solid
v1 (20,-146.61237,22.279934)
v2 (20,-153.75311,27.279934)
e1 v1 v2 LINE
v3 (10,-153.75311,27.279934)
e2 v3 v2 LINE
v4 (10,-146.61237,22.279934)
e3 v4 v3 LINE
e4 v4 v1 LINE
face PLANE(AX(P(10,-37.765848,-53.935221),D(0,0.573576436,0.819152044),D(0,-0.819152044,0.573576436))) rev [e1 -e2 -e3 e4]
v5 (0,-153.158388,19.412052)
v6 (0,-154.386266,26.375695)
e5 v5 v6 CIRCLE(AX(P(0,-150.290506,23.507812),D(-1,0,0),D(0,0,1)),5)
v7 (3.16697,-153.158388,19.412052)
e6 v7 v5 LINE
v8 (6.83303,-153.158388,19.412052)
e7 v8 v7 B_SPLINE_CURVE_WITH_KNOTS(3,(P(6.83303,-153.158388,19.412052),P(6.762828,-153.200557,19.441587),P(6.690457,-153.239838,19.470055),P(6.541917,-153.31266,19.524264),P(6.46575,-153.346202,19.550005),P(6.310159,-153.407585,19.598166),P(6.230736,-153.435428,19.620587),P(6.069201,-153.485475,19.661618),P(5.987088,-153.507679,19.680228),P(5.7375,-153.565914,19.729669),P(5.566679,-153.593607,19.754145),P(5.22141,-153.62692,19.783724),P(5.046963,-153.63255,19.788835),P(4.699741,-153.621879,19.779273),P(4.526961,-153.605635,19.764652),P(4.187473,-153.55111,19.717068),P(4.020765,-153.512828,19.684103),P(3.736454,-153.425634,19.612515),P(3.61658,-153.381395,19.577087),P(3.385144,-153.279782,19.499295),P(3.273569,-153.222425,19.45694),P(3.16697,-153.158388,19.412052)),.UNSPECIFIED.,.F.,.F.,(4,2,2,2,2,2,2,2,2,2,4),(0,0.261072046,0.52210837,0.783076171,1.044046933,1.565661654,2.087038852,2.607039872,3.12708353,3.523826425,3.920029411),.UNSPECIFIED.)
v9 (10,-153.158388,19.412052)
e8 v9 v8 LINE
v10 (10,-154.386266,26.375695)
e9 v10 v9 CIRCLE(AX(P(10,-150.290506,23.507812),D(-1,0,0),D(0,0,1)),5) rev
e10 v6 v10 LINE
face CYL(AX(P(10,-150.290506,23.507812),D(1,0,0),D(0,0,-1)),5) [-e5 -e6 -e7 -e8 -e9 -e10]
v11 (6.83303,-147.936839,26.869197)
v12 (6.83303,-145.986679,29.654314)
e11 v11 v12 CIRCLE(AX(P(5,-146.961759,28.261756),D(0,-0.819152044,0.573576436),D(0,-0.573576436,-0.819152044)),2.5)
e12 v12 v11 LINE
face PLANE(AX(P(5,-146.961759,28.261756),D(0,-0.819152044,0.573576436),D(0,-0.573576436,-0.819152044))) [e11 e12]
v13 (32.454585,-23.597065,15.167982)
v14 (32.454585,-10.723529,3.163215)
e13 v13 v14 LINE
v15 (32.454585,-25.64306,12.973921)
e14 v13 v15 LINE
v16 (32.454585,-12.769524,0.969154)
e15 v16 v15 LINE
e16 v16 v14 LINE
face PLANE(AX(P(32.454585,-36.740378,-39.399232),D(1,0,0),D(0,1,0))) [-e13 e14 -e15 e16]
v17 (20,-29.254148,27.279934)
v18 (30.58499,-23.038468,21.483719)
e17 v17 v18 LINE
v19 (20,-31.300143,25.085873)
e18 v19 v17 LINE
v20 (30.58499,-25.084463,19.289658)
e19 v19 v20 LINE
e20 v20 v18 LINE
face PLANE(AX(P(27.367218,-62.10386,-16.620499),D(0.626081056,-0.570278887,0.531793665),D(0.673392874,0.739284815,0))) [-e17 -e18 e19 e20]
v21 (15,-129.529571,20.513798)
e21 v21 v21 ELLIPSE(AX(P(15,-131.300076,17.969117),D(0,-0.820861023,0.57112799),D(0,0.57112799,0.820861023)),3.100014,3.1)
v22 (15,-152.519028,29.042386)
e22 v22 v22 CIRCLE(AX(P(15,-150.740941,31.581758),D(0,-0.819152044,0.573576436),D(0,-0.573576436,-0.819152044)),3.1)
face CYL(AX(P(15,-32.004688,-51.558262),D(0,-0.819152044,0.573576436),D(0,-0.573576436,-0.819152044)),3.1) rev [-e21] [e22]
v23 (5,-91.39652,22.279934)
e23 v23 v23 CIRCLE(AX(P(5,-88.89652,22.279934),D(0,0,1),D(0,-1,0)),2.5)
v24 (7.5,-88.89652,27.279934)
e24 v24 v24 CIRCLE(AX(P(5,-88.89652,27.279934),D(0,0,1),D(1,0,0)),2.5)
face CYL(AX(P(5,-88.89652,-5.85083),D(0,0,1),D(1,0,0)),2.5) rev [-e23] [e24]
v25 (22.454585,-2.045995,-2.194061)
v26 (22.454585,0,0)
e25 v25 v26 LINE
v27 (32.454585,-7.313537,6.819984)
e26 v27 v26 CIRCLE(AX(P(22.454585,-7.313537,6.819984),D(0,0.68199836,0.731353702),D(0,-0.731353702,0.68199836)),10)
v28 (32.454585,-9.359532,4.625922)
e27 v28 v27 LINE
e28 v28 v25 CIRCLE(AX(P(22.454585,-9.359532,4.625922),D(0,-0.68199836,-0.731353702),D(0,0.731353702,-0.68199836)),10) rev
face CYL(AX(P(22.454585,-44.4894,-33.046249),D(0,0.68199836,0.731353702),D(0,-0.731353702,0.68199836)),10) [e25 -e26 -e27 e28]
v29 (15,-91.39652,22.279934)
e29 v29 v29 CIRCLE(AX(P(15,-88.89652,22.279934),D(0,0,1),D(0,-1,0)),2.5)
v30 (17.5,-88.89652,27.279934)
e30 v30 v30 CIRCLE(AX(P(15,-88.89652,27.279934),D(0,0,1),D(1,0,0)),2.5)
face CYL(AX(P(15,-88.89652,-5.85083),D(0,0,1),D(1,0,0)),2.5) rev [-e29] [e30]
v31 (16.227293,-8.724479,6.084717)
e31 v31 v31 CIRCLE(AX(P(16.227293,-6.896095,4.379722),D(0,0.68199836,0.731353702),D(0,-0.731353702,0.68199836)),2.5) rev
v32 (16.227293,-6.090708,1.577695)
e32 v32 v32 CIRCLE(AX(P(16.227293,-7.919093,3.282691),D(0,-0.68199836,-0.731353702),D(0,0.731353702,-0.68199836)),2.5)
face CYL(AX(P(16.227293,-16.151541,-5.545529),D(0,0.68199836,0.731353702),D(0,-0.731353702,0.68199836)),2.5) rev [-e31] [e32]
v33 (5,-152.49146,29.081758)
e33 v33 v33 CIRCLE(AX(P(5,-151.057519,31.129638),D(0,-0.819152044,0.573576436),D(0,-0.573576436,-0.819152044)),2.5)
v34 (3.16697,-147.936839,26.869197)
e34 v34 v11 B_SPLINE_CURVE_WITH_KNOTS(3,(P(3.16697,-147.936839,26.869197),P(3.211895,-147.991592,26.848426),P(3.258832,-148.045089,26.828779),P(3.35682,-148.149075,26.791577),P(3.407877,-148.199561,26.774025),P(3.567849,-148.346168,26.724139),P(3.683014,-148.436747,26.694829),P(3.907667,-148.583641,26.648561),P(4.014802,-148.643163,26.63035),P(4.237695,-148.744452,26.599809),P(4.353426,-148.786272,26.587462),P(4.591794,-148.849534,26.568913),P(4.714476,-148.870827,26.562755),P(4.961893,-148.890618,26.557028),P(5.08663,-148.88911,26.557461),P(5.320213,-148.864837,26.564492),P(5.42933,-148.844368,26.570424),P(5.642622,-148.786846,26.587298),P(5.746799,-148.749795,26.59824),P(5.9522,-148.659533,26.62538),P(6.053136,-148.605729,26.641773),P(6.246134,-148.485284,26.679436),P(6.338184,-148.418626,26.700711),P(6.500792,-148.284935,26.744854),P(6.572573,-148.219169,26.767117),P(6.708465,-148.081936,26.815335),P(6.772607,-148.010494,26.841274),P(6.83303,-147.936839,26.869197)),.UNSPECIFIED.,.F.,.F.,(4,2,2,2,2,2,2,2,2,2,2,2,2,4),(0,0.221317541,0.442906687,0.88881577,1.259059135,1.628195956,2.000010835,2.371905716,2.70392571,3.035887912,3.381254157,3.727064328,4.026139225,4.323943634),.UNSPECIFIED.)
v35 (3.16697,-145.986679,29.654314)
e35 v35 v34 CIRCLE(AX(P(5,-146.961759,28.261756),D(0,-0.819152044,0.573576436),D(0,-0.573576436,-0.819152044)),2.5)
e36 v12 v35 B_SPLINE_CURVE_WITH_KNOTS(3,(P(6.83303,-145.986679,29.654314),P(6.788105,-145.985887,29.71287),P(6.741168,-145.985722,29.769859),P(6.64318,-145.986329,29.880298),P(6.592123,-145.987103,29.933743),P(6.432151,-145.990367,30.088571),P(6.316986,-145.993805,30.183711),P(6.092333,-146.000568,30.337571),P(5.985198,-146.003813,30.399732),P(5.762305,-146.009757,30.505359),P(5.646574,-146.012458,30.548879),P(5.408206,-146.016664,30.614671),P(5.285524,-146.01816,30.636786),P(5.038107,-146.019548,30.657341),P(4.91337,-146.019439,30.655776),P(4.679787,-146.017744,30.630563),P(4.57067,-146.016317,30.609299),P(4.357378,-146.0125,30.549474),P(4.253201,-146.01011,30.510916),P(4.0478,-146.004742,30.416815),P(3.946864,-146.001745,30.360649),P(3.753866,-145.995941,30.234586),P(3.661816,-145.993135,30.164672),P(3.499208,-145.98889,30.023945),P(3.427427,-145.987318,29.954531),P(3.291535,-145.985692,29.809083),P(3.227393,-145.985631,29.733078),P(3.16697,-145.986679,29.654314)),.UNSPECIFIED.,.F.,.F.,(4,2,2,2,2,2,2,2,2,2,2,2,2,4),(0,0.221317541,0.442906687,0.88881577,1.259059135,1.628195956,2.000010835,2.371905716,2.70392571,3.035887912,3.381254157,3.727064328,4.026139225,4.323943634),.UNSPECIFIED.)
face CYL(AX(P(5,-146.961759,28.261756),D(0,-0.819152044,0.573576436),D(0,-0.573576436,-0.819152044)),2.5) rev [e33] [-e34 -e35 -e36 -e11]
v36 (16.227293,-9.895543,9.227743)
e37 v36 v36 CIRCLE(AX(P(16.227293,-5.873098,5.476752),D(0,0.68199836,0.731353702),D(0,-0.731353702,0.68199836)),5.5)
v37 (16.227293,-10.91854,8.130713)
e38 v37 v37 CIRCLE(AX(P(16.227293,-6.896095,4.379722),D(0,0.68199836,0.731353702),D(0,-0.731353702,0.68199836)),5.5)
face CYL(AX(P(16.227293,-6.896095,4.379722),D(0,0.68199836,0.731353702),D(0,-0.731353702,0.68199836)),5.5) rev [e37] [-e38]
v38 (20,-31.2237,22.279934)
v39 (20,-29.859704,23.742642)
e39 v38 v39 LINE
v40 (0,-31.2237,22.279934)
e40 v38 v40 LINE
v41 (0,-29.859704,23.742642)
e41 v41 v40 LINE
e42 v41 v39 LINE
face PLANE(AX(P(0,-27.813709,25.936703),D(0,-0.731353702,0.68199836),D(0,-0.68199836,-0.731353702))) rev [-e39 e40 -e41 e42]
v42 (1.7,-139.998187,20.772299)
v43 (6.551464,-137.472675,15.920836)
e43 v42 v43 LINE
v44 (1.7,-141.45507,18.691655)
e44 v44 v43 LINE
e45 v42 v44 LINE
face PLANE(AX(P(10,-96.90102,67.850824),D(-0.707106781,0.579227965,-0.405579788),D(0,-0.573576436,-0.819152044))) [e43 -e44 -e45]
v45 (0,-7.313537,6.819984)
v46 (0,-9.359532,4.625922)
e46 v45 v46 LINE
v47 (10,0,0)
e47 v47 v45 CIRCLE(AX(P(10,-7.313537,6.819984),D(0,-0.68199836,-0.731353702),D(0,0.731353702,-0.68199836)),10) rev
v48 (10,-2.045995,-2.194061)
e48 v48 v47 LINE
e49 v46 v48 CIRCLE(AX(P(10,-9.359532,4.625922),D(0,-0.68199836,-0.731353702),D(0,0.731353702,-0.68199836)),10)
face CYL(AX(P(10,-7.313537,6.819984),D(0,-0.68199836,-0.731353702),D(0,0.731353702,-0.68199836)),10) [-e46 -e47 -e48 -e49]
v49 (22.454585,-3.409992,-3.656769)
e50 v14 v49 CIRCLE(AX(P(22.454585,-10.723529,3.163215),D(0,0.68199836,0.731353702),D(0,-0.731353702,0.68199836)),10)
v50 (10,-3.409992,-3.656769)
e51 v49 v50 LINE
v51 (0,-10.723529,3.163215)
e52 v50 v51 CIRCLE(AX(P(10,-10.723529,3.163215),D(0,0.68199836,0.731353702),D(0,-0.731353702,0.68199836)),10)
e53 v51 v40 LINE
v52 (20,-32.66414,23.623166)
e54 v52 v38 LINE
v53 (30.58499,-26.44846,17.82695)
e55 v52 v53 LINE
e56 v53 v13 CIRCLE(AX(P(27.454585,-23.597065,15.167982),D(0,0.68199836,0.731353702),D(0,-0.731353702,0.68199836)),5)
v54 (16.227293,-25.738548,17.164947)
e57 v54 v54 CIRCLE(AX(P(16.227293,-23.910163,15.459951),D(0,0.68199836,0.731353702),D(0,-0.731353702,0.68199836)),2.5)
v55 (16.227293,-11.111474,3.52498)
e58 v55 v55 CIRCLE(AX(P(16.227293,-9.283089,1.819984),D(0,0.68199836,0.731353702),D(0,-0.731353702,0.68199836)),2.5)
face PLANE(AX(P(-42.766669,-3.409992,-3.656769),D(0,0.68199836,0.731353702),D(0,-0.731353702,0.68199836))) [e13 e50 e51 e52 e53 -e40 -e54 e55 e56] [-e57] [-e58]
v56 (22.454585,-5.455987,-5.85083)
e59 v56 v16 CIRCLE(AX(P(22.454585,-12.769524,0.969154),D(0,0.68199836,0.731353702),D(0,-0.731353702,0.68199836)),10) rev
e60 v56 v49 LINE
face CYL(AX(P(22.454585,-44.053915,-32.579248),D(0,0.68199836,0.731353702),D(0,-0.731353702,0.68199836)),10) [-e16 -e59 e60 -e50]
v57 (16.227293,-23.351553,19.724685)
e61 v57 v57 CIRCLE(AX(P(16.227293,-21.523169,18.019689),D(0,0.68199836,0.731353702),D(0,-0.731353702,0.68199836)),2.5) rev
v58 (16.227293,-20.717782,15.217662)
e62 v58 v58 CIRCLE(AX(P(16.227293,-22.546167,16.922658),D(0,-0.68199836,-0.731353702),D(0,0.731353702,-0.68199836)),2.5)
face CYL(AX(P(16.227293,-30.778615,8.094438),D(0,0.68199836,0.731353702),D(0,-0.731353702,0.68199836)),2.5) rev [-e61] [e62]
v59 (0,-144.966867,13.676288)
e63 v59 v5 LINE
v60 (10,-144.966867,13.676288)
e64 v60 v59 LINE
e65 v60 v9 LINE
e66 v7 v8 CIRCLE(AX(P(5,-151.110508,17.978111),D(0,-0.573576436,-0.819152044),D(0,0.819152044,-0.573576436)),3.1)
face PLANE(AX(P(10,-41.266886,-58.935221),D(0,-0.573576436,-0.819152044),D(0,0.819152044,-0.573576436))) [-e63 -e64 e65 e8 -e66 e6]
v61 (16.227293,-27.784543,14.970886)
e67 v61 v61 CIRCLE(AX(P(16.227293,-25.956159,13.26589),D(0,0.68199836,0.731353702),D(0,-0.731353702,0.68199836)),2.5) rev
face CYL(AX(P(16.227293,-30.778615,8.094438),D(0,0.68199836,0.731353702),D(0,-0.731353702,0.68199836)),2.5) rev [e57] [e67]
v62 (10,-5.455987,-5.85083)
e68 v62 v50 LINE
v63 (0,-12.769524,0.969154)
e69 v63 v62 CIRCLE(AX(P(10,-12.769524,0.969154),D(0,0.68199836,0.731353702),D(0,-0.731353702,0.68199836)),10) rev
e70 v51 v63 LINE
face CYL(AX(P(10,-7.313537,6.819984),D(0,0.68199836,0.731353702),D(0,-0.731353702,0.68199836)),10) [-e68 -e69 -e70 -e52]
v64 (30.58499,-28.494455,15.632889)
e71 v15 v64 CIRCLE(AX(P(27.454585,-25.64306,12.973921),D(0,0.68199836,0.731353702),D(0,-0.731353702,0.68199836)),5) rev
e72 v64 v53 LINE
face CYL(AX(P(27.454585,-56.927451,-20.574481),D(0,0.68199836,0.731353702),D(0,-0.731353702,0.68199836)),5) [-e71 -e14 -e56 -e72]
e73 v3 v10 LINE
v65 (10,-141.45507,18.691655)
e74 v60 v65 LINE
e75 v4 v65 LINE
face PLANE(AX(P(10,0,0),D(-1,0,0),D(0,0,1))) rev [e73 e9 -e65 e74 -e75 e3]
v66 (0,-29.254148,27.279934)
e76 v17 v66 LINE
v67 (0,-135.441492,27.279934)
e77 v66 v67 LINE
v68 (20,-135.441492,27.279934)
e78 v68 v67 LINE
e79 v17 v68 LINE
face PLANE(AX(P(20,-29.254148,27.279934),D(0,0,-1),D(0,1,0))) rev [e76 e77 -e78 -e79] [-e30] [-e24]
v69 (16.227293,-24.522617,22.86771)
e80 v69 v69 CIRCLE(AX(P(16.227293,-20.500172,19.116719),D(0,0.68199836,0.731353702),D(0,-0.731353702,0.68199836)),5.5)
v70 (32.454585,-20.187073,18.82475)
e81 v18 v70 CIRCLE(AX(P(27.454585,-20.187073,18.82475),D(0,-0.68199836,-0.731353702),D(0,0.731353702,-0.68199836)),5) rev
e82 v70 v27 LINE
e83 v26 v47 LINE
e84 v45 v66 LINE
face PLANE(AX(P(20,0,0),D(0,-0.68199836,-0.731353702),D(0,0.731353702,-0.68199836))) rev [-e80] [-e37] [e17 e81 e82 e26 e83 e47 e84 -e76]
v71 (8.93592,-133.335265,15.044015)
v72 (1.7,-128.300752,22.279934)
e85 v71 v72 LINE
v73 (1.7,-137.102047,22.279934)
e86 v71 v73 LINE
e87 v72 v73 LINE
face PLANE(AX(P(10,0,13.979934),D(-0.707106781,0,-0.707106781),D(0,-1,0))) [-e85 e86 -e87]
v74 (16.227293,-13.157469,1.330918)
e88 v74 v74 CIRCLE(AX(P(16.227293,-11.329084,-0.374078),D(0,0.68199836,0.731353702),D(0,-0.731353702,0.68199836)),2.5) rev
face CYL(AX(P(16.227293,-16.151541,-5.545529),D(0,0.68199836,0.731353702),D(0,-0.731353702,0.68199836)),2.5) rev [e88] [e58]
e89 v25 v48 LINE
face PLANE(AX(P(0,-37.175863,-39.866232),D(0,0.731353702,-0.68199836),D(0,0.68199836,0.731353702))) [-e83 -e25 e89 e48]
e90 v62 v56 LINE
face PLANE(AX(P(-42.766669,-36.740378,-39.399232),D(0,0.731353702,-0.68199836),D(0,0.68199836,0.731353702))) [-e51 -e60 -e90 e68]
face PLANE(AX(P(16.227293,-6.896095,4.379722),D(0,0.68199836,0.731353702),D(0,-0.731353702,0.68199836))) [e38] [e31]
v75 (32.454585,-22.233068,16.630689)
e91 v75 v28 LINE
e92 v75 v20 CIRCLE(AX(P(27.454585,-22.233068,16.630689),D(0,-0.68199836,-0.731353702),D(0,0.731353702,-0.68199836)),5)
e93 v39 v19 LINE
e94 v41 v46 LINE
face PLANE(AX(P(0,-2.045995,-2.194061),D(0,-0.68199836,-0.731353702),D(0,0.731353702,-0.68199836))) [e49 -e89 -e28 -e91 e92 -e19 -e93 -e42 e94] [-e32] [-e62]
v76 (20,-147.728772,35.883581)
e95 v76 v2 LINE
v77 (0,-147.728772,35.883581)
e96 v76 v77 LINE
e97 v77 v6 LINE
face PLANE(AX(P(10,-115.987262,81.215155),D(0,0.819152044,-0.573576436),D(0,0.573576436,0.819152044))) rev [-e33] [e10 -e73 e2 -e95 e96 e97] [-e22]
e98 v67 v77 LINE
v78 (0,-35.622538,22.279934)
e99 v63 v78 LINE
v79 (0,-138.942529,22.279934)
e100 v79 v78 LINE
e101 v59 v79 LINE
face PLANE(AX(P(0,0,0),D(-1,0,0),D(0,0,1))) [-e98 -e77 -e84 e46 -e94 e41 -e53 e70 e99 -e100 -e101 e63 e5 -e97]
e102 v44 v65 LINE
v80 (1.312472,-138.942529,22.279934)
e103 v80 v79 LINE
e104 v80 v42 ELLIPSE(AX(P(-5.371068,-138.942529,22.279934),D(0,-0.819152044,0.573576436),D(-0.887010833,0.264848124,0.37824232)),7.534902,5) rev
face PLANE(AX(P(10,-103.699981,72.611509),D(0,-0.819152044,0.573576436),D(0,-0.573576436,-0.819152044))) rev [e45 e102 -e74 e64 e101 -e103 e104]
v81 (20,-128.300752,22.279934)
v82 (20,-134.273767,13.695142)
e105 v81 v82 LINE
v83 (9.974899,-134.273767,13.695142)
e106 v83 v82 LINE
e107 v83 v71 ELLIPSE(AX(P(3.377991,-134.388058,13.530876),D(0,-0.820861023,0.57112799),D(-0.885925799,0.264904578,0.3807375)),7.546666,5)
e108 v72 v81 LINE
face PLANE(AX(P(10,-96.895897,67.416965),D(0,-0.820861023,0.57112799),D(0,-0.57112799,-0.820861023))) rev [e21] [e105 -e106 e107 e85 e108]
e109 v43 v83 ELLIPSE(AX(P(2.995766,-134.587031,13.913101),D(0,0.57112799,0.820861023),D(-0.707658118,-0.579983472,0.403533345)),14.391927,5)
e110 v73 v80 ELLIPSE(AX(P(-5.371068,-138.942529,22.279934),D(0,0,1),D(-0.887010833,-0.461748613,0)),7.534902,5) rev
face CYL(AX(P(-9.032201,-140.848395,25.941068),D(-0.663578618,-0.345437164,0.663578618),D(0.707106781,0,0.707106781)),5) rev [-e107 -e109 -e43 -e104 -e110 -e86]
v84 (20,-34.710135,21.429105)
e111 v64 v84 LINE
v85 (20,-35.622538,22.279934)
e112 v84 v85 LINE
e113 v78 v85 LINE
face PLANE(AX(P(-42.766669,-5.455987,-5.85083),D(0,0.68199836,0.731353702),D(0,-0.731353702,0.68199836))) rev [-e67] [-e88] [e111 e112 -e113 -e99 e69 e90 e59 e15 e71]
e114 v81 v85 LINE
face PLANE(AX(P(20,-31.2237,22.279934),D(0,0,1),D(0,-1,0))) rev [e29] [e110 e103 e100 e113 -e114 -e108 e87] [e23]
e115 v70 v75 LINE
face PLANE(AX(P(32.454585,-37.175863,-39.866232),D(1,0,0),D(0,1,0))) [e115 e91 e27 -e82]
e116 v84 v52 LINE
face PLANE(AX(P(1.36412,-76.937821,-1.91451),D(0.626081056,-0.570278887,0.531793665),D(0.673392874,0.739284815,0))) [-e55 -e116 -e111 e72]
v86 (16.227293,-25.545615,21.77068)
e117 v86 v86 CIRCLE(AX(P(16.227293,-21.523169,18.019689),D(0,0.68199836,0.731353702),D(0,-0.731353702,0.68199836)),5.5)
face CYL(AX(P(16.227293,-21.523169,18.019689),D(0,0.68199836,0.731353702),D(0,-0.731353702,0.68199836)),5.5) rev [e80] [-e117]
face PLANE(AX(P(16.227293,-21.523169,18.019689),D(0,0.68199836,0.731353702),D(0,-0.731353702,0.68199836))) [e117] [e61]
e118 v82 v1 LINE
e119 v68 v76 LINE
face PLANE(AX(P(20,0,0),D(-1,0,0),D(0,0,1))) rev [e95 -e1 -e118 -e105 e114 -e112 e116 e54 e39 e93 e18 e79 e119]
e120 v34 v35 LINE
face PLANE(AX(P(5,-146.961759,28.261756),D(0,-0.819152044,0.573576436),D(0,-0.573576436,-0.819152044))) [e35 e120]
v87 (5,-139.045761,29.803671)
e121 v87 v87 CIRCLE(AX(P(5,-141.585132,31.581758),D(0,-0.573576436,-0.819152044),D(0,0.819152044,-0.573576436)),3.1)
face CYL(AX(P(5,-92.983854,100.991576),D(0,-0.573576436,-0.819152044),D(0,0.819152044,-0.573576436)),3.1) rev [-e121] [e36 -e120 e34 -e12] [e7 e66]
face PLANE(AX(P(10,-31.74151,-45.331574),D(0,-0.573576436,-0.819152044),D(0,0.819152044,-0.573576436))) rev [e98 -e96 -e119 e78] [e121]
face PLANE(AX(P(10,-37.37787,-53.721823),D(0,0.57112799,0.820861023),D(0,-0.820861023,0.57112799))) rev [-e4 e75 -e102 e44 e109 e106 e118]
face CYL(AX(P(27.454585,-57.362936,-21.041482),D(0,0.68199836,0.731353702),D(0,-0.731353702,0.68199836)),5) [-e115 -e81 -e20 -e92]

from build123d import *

# Parameters (mm, degrees)
BOSS_EXTRUDE1_DEPTH     = 20
CUT_EXTRUDE1_DEPTH      = 173.601162969
CUT_EXTRUDE1_DEPTH_BACK = 173.601162969
BOSS_EXTRUDE2_DEPTH     = 20
BOSS_EXTRUDE4_DEPTH     = 10
SKETCH7_R               = 3.1
CUT_EXTRUDE3_DEPTH      = 161.534558428
BOSS_EXTRUDE5_DEPTH     = 10
SKETCH9_R               = 3.1
CUT_EXTRUDE4_DEPTH      = 147.401949114
CUT_EXTRUDE5_DEPTH      = 175.168303714
CUT_EXTRUDE6_DEPTH      = 10
SKETCH12_R              = 2.5
CUT_EXTRUDE7_DEPTH      = 162.946023748
FILLET3_R               = 5
FILLET4_R               = 10
SKETCH15_R              = 2.5
CUT_EXTRUDE10_DEPTH     = 5
BOSS_EXTRUDE6_DEPTH     = 3
BOSS_EXTRUDE7_START     = -5
BOSS_EXTRUDE7_DEPTH     = 3
CUT_EXTRUDE11_REACH     = 164.653
SKETCH16_4_R            = 2.5
CHAMFER1_SIZE           = 8.3
FILLET5_R               = 5
SKETCH17_R              = 5.5
CUT_EXTRUDE12_DEPTH     = 1.5
FILLET6_R               = 5


# Read off the part's stored shape, not the designer's step: Save Bodies1
# Some blends are built 0.0001 mm under size
with BuildPart() as part:
    # Sketch1 → Boss-Extrude1 (new body)
    with BuildSketch(Plane(origin=(0, 0, 0), x_dir=(0, 0, -1), z_dir=(1, 0, 0))):
        Polygon((0, 0), (-27.279934402, -29.254148065), (-27.279934402, -169.254148065), (-22.279934402, -169.254148065), (-22.279934402, -31.223700443), (3.656768508, -3.4099918), align=None)
    extrude(amount=BOSS_EXTRUDE1_DEPTH)

    # Sketch2 → Cut-Extrude1 (cut, two sides: drawn at the far end of the back side and taken through both)
    with BuildSketch(Plane(origin=(20, 0, 0), x_dir=(0, 0, -1), z_dir=(1, 0, 0)).offset(-CUT_EXTRUDE1_DEPTH_BACK)):
        Polygon((2.194061105, -2.04599508), (-23.742641806, -29.859703723), (-22.279934402, -31.223700443), (3.656768508, -3.4099918), align=None)
    extrude(amount=CUT_EXTRUDE1_DEPTH + CUT_EXTRUDE1_DEPTH_BACK, mode=Mode.SUBTRACT)

    # Sketch3 → Boss-Extrude2 (add)
    with BuildSketch(Plane(origin=(20, 0, 0), x_dir=(0, 0, -1), z_dir=(1, 0, 0))):
        Polygon((3.656768508, -3.4099918), (-22.279934402, -31.223700443), (-20.085873298, -33.269695523), (5.850829613, -5.45598688), align=None)
        Polygon((-22.279934402, -35.622538), (-20.085873298, -33.269695523), (-22.279934402, -31.223700443), align=None)
    extrude(amount=-BOSS_EXTRUDE2_DEPTH)

    # Sketch6 → Boss-Extrude4 (add)
    with BuildSketch(Plane.ZY):
        Polygon((27.279934402, -135.441491542), (27.279934402, -153.753110374), (35.883580948, -147.728772207), align=None)
        Polygon((22.279934402, -138.942529233), (13.676287857, -144.9668674), (22.279934402, -157.254148065), align=None)
    extrude(amount=-BOSS_EXTRUDE4_DEPTH)

    # Sketch7 → Cut-Extrude3 (cut, through all)
    with BuildSketch(Plane(origin=(0, -41.266885928, -58.935220882), x_dir=(-1, 0, 0), z_dir=(0, -0.5735764363510402, -0.8191520442889961))):
        with Locations(Location((-5, -134.094302237, 0), (0, 0, 90))):
            Circle(SKETCH7_R)
    extrude(amount=-CUT_EXTRUDE3_DEPTH, mode=Mode.SUBTRACT)

    # Sketch8 → Boss-Extrude5 (add)
    with BuildSketch(Plane(origin=(20, 0, 0), x_dir=(0, 0, -1), z_dir=(1, 0, 0))):
        Polygon((-35.883580948, -147.728772207), (-31.581757675, -150.74094129), (-27.279934402, -144.597300958), (-27.279934402, -135.441491542), align=None)
        Polygon((-17.969117113, -131.300075805), (-22.279934402, -137.456560924), (-22.279934402, -146.61237034), (-13.695141582, -134.273766824), align=None)
        Polygon((-27.279934402, -144.597300958), (-31.581757675, -150.74094129), (-27.279934402, -153.753110374), align=None)
        Polygon((-22.279934402, -128.300751509), (-22.279934402, -137.456560924), (-17.969117113, -131.300075805), align=None)
    extrude(amount=-BOSS_EXTRUDE5_DEPTH)

    # Sketch9 → Cut-Extrude4 (cut, through all)
    with BuildSketch(Plane(origin=(0, -115.987262137, 81.215155285), x_dir=(-1, 0, 0), z_dir=(0, -0.8191520442889961, 0.5735764363510402))):
        with Locations(Location((-15, 60.591190556, 0), (0, 0, 90))):
            Circle(SKETCH9_R)
    extrude(amount=-CUT_EXTRUDE4_DEPTH, mode=Mode.SUBTRACT)

    # Sketch10 → Cut-Extrude5 (cut, through all)
    with BuildSketch(Plane.ZY):
        Polygon((22.279934402, -157.254148065), (27.279934402, -153.753110374), (27.279934402, -169.254148065), (22.279934402, -169.254148065), align=None)
    extrude(amount=-CUT_EXTRUDE5_DEPTH, mode=Mode.SUBTRACT)

    # Sketch11 → Cut-Extrude6 (cut)
    with BuildSketch(Plane(origin=(20, 0, 0), x_dir=(0, 0, -1), z_dir=(1, 0, 0))):
        Polygon((-22.279934402, -157.254148065), (-22.279934402, -146.61237034), (-27.279934403, -153.753110374), align=None)
    extrude(amount=-CUT_EXTRUDE6_DEPTH, mode=Mode.SUBTRACT)

    # Sketch12 → Cut-Extrude7 (cut, through all)
    with BuildSketch(Plane.XY.offset(27.279934402)):
        with Locations((5, -88.896520317)):
            Circle(SKETCH12_R)
        with Locations((15, -88.896520317)):
            Circle(SKETCH12_R)
    extrude(amount=-CUT_EXTRUDE7_DEPTH, mode=Mode.SUBTRACT)

    # Fillet3
    # the kernel refuses this fillet: 5 mm, written as the material it takes off along each edge
    with BuildSketch(Plane(origin=(-12.5, -157.254148065, 22.279934402), x_dir=(0, 0.5735764363510394, 0.8191520442889965), z_dir=(1, 0, 0))) as fillet3_piece_1:
        with BuildLine():
            CenterArc((FILLET3_R, -FILLET3_R), FILLET3_R, 90, 90)
            Line((0, -FILLET3_R), (0, 0))
            Line((0, 0), (FILLET3_R, 0))
        make_face()
    extrude(amount=35, mode=Mode.SUBTRACT)

    # Fillet4
    fillet4_edges = [part.edges().sort_by_distance(p)[0] for p in [
        (0, -4.43298934, -4.753799061),
        (20, -4.43298934, -4.753799061),
        (0, -1.02299754, -1.097030552),
        (20, -1.02299754, -1.097030552),
    ]]
    fillet(fillet4_edges, radius=FILLET4_R - 0.0001)  # a hair under: the kernel refuses the full size

    # Sketch15 → Cut-Extrude10 (cut)
    with BuildSketch(Plane(origin=(0, -115.987262137, 81.215155285), x_dir=(1, 0, 0), z_dir=(0, -0.8191520442889961, 0.5735764363510402))):
        with Locations(Location((5, -61.143127027, 0), (0, 0, 270))):
            Circle(SKETCH15_R)
    extrude(amount=-CUT_EXTRUDE10_DEPTH, mode=Mode.SUBTRACT)

    # Sketch16 → Boss-Extrude6 (add)
    with BuildSketch(Plane(origin=(0, 0, 0), x_dir=(1, 0, 0), z_dir=(0, 0.6819983600624997, 0.7313537016191695))):
        with BuildLine():
            Line((20, -10), (20, -40))
            Line((20, -40), (32.454585159, -30))
            Line((32.454585159, -30), (32.454585159, -10))
            ThreePointArc((32.454585159, -10), (29.52565297, -2.928932188), (22.454585159, 0))
            Line((22.454585159, 0), (10, 0))
            ThreePointArc((10, 0), (17.071067812, -2.928932188), (20, -10))
        make_face()
    extrude(amount=-BOSS_EXTRUDE6_DEPTH)

    # Sketch16<3> → Boss-Extrude7 (add)
    with BuildSketch(Plane(origin=(0, 0, 0), x_dir=(1, 0, 0), z_dir=(0, 0.6819983600624997, 0.7313537016191695)).offset(BOSS_EXTRUDE7_START)):
        with BuildLine():
            Line((20, -10), (20, -40))
            Line((20, -40), (32.454585159, -30))
            Line((32.454585159, -30), (32.454585159, -10))
            ThreePointArc((32.454585159, -10), (29.52565297, -2.928932188), (22.454585159, 0))
            Line((22.454585159, 0), (10, 0))
            ThreePointArc((10, 0), (17.071067812, -2.928932188), (20, -10))
        make_face()
    extrude(amount=-BOSS_EXTRUDE7_DEPTH)

    # Cut-Extrude11: up to this face of the body (flat: up to its plane)
    cut_extrude11_end = Plane(part.part.faces().sort_by_distance((15.482284505, -20.226716455, 7.923098549))[0])
    # Sketch16<4> → Cut-Extrude11 (cut, up to the picked face)
    with BuildSketch(Plane(origin=(0, 0, 0), x_dir=(1, 0, 0), z_dir=(0, 0.6819983600624997, 0.7313537016191695)), mode=Mode.PRIVATE) as cut_extrude11_sk1:
        with BuildLine():
            ThreePointArc((13.727292579, -8.030447622), (16.227292579, -10.530447622), (18.727292579, -8.030447622))
            Line((18.727292579, -8.030447622), (13.727292579, -8.030447622))
        make_face()
    cut_extrude11_tool1 = split(extrude(cut_extrude11_sk1.sketch, amount=-CUT_EXTRUDE11_REACH, mode=Mode.PRIVATE), bisect_by=cut_extrude11_end, keep=Keep.BOTH, mode=Mode.PRIVATE)
    # Sketch16<4> → Cut-Extrude11 (cut, up to the picked face)
    with BuildSketch(Plane(origin=(0, 0, 0), x_dir=(1, 0, 0), z_dir=(0, 0.6819983600624997, 0.7313537016191695)), mode=Mode.PRIVATE) as cut_extrude11_sk2:
        with BuildLine():
            Line((13.727292579, -8.030447622), (18.727292579, -8.030447622))
            ThreePointArc((18.727292579, -8.030447622), (16.227292579, -5.530447622), (13.727292579, -8.030447622))
        make_face()
    cut_extrude11_tool2 = split(extrude(cut_extrude11_sk2.sketch, amount=-CUT_EXTRUDE11_REACH, mode=Mode.PRIVATE), bisect_by=cut_extrude11_end, keep=Keep.BOTH, mode=Mode.PRIVATE)
    # Sketch16<4> → Cut-Extrude11 (cut, up to the picked face)
    with BuildSketch(Plane(origin=(0, 0, 0), x_dir=(1, 0, 0), z_dir=(0, 0.6819983600624997, 0.7313537016191695)), mode=Mode.PRIVATE) as cut_extrude11_sk3:
        with BuildLine():
            ThreePointArc((13.727292579, -8.030447622), (16.227292579, -10.530447622), (18.727292579, -8.030447622))
            Line((18.727292579, -8.030447622), (13.727292579, -8.030447622))
        make_face()
    cut_extrude11_tool3 = split(extrude(cut_extrude11_sk3.sketch, amount=-CUT_EXTRUDE11_REACH, mode=Mode.PRIVATE), bisect_by=cut_extrude11_end, keep=Keep.BOTH, mode=Mode.PRIVATE)
    # Sketch16<4> → Cut-Extrude11 (cut, up to the picked face)
    with BuildSketch(Plane(origin=(0, 0, 0), x_dir=(1, 0, 0), z_dir=(0, 0.6819983600624997, 0.7313537016191695)), mode=Mode.PRIVATE) as cut_extrude11_sk4:
        with BuildLine():
            Line((13.727292579, -8.030447622), (18.727292579, -8.030447622))
            ThreePointArc((18.727292579, -8.030447622), (16.227292579, -5.530447622), (13.727292579, -8.030447622))
        make_face()
    cut_extrude11_tool4 = split(extrude(cut_extrude11_sk4.sketch, amount=-CUT_EXTRUDE11_REACH, mode=Mode.PRIVATE), bisect_by=cut_extrude11_end, keep=Keep.BOTH, mode=Mode.PRIVATE)
    # Sketch16<4> → Cut-Extrude11 (cut, up to the picked face)
    with BuildSketch(Plane(origin=(0, 0, 0), x_dir=(1, 0, 0), z_dir=(0, 0.6819983600624997, 0.7313537016191695)), mode=Mode.PRIVATE) as cut_extrude11_sk5:
        with Locations(Location((16.227292579, -28.030447622, 0), (0, 0, 270))):
            Circle(SKETCH16_4_R)
    cut_extrude11_tool5 = split(extrude(cut_extrude11_sk5.sketch, amount=-CUT_EXTRUDE11_REACH, mode=Mode.PRIVATE), bisect_by=cut_extrude11_end, keep=Keep.BOTH, mode=Mode.PRIVATE)
    add(cut_extrude11_tool1.solids().sort_by(Axis((16.227293, -6.649088, 6.200375), (0, -0.6819983600624997, -0.7313537016191695)))[0], mode=Mode.SUBTRACT)
    add(cut_extrude11_tool2.solids().sort_by(Axis((16.227293, -5.097107, 4.753129), (0, -0.6819983600624997, -0.7313537016191695)))[0], mode=Mode.SUBTRACT)
    add(cut_extrude11_tool3.solids().sort_by(Axis((16.227293, -6.649088, 6.200375), (0, -0.6819983600624997, -0.7313537016191695)))[0], mode=Mode.SUBTRACT)
    add(cut_extrude11_tool4.solids().sort_by(Axis((16.227293, -5.097107, 4.753129), (0, -0.6819983600624997, -0.7313537016191695)))[0], mode=Mode.SUBTRACT)
    add(cut_extrude11_tool5.solids().sort_by(Axis((16.227293, -20.500172, 19.116719), (0, -0.6819983600624997, -0.7313537016191695)))[0], mode=Mode.SUBTRACT)

    # Chamfer1
    chamfer1_edges = [part.edges().sort_by_distance(p)[0] for p in [
        (10, -140.198799419, 20.485794641),
        (10, -133.621640371, 22.279934402),
    ]]
    chamfer(chamfer1_edges, length=CHAMFER1_SIZE)

    # Fillet5
    # the kernel refuses this fillet: 5 mm, written as the material it adds along each edge
    with BuildSketch(Plane(origin=(-1.165308952, -140.434114663, 25.145243354), x_dir=(-0.24426096127254496, -0.7383550160762786, -0.6286242542514651), z_dir=(0.6635786184004234, 0.34543716418991527, -0.6635786184004234))) as fillet5_piece_1_section:
        with BuildLine():
            CenterArc((FILLET5_R * 0.34543716419, FILLET5_R), FILLET5_R, 231.886370385, 38.113629615)
            Line((-FILLET5_R * 0.271785890905, FILLET5_R * 0.213211781824), (0, 0))
            Line((0, 0), (FILLET5_R * 0.34543716419, 0))
        make_face()
    fillet5_piece_1 = extrude(amount=21.143866778, mode=Mode.PRIVATE)
    fillet5_piece_1 = split(fillet5_piece_1, bisect_by=Plane(origin=(-1.165308952, -143.792687167, 20.318091976), z_dir=(0, 0.5711279895091977, 0.8208610233158727)), keep=Keep.TOP, mode=Mode.PRIVATE)
    fillet5_piece_1 = split(fillet5_piece_1, bisect_by=Plane(origin=(-1.165308952, -130.915194321, 18.522292961), z_dir=(0, -0.8208610233158725, 0.5711279895091982)), keep=Keep.TOP, mode=Mode.PRIVATE)
    fillet5_piece_1 = split(fillet5_piece_1, bisect_by=Plane(origin=(-1.165308952, -138.086990978, 23.501769657), z_dir=(0, 0.8191520442889962, -0.5735764363510399)), keep=Keep.TOP, mode=Mode.PRIVATE)
    add(fillet5_piece_1)

    # Sketch17 → Cut-Extrude12 (cut)
    with BuildSketch(Plane(origin=(0, 0, 0), x_dir=(1, 0, 0), z_dir=(0, 0.6819983600624997, 0.7313537016191695))):
        with Locations(Location((16.227292579, -28.030447622, 0), (0, 0, 270))):
            Circle(SKETCH17_R)
        with Locations(Location((16.227292579, -8.030447622, 0), (0, 0, 270))):
            Circle(SKETCH17_R)
    extrude(amount=-CUT_EXTRUDE12_DEPTH, mode=Mode.SUBTRACT)

    # Fillet6
    fillet6_edges = [part.edges().sort_by_distance(p)[0] for p in [
        (32.454585159, -22.963608589, 19.362920249),
        (32.454585159, -26.373600389, 15.706151741),
    ]]
    fillet(fillet6_edges, radius=FILLET6_R)


with BuildPart() as body_2:
    # Mirror1: mirrored copy
    add(part.part.mirror(Plane(origin=(30, 0, 0), x_dir=(0, 0, 1), z_dir=(1, 0, 0))))


solid = part.part
